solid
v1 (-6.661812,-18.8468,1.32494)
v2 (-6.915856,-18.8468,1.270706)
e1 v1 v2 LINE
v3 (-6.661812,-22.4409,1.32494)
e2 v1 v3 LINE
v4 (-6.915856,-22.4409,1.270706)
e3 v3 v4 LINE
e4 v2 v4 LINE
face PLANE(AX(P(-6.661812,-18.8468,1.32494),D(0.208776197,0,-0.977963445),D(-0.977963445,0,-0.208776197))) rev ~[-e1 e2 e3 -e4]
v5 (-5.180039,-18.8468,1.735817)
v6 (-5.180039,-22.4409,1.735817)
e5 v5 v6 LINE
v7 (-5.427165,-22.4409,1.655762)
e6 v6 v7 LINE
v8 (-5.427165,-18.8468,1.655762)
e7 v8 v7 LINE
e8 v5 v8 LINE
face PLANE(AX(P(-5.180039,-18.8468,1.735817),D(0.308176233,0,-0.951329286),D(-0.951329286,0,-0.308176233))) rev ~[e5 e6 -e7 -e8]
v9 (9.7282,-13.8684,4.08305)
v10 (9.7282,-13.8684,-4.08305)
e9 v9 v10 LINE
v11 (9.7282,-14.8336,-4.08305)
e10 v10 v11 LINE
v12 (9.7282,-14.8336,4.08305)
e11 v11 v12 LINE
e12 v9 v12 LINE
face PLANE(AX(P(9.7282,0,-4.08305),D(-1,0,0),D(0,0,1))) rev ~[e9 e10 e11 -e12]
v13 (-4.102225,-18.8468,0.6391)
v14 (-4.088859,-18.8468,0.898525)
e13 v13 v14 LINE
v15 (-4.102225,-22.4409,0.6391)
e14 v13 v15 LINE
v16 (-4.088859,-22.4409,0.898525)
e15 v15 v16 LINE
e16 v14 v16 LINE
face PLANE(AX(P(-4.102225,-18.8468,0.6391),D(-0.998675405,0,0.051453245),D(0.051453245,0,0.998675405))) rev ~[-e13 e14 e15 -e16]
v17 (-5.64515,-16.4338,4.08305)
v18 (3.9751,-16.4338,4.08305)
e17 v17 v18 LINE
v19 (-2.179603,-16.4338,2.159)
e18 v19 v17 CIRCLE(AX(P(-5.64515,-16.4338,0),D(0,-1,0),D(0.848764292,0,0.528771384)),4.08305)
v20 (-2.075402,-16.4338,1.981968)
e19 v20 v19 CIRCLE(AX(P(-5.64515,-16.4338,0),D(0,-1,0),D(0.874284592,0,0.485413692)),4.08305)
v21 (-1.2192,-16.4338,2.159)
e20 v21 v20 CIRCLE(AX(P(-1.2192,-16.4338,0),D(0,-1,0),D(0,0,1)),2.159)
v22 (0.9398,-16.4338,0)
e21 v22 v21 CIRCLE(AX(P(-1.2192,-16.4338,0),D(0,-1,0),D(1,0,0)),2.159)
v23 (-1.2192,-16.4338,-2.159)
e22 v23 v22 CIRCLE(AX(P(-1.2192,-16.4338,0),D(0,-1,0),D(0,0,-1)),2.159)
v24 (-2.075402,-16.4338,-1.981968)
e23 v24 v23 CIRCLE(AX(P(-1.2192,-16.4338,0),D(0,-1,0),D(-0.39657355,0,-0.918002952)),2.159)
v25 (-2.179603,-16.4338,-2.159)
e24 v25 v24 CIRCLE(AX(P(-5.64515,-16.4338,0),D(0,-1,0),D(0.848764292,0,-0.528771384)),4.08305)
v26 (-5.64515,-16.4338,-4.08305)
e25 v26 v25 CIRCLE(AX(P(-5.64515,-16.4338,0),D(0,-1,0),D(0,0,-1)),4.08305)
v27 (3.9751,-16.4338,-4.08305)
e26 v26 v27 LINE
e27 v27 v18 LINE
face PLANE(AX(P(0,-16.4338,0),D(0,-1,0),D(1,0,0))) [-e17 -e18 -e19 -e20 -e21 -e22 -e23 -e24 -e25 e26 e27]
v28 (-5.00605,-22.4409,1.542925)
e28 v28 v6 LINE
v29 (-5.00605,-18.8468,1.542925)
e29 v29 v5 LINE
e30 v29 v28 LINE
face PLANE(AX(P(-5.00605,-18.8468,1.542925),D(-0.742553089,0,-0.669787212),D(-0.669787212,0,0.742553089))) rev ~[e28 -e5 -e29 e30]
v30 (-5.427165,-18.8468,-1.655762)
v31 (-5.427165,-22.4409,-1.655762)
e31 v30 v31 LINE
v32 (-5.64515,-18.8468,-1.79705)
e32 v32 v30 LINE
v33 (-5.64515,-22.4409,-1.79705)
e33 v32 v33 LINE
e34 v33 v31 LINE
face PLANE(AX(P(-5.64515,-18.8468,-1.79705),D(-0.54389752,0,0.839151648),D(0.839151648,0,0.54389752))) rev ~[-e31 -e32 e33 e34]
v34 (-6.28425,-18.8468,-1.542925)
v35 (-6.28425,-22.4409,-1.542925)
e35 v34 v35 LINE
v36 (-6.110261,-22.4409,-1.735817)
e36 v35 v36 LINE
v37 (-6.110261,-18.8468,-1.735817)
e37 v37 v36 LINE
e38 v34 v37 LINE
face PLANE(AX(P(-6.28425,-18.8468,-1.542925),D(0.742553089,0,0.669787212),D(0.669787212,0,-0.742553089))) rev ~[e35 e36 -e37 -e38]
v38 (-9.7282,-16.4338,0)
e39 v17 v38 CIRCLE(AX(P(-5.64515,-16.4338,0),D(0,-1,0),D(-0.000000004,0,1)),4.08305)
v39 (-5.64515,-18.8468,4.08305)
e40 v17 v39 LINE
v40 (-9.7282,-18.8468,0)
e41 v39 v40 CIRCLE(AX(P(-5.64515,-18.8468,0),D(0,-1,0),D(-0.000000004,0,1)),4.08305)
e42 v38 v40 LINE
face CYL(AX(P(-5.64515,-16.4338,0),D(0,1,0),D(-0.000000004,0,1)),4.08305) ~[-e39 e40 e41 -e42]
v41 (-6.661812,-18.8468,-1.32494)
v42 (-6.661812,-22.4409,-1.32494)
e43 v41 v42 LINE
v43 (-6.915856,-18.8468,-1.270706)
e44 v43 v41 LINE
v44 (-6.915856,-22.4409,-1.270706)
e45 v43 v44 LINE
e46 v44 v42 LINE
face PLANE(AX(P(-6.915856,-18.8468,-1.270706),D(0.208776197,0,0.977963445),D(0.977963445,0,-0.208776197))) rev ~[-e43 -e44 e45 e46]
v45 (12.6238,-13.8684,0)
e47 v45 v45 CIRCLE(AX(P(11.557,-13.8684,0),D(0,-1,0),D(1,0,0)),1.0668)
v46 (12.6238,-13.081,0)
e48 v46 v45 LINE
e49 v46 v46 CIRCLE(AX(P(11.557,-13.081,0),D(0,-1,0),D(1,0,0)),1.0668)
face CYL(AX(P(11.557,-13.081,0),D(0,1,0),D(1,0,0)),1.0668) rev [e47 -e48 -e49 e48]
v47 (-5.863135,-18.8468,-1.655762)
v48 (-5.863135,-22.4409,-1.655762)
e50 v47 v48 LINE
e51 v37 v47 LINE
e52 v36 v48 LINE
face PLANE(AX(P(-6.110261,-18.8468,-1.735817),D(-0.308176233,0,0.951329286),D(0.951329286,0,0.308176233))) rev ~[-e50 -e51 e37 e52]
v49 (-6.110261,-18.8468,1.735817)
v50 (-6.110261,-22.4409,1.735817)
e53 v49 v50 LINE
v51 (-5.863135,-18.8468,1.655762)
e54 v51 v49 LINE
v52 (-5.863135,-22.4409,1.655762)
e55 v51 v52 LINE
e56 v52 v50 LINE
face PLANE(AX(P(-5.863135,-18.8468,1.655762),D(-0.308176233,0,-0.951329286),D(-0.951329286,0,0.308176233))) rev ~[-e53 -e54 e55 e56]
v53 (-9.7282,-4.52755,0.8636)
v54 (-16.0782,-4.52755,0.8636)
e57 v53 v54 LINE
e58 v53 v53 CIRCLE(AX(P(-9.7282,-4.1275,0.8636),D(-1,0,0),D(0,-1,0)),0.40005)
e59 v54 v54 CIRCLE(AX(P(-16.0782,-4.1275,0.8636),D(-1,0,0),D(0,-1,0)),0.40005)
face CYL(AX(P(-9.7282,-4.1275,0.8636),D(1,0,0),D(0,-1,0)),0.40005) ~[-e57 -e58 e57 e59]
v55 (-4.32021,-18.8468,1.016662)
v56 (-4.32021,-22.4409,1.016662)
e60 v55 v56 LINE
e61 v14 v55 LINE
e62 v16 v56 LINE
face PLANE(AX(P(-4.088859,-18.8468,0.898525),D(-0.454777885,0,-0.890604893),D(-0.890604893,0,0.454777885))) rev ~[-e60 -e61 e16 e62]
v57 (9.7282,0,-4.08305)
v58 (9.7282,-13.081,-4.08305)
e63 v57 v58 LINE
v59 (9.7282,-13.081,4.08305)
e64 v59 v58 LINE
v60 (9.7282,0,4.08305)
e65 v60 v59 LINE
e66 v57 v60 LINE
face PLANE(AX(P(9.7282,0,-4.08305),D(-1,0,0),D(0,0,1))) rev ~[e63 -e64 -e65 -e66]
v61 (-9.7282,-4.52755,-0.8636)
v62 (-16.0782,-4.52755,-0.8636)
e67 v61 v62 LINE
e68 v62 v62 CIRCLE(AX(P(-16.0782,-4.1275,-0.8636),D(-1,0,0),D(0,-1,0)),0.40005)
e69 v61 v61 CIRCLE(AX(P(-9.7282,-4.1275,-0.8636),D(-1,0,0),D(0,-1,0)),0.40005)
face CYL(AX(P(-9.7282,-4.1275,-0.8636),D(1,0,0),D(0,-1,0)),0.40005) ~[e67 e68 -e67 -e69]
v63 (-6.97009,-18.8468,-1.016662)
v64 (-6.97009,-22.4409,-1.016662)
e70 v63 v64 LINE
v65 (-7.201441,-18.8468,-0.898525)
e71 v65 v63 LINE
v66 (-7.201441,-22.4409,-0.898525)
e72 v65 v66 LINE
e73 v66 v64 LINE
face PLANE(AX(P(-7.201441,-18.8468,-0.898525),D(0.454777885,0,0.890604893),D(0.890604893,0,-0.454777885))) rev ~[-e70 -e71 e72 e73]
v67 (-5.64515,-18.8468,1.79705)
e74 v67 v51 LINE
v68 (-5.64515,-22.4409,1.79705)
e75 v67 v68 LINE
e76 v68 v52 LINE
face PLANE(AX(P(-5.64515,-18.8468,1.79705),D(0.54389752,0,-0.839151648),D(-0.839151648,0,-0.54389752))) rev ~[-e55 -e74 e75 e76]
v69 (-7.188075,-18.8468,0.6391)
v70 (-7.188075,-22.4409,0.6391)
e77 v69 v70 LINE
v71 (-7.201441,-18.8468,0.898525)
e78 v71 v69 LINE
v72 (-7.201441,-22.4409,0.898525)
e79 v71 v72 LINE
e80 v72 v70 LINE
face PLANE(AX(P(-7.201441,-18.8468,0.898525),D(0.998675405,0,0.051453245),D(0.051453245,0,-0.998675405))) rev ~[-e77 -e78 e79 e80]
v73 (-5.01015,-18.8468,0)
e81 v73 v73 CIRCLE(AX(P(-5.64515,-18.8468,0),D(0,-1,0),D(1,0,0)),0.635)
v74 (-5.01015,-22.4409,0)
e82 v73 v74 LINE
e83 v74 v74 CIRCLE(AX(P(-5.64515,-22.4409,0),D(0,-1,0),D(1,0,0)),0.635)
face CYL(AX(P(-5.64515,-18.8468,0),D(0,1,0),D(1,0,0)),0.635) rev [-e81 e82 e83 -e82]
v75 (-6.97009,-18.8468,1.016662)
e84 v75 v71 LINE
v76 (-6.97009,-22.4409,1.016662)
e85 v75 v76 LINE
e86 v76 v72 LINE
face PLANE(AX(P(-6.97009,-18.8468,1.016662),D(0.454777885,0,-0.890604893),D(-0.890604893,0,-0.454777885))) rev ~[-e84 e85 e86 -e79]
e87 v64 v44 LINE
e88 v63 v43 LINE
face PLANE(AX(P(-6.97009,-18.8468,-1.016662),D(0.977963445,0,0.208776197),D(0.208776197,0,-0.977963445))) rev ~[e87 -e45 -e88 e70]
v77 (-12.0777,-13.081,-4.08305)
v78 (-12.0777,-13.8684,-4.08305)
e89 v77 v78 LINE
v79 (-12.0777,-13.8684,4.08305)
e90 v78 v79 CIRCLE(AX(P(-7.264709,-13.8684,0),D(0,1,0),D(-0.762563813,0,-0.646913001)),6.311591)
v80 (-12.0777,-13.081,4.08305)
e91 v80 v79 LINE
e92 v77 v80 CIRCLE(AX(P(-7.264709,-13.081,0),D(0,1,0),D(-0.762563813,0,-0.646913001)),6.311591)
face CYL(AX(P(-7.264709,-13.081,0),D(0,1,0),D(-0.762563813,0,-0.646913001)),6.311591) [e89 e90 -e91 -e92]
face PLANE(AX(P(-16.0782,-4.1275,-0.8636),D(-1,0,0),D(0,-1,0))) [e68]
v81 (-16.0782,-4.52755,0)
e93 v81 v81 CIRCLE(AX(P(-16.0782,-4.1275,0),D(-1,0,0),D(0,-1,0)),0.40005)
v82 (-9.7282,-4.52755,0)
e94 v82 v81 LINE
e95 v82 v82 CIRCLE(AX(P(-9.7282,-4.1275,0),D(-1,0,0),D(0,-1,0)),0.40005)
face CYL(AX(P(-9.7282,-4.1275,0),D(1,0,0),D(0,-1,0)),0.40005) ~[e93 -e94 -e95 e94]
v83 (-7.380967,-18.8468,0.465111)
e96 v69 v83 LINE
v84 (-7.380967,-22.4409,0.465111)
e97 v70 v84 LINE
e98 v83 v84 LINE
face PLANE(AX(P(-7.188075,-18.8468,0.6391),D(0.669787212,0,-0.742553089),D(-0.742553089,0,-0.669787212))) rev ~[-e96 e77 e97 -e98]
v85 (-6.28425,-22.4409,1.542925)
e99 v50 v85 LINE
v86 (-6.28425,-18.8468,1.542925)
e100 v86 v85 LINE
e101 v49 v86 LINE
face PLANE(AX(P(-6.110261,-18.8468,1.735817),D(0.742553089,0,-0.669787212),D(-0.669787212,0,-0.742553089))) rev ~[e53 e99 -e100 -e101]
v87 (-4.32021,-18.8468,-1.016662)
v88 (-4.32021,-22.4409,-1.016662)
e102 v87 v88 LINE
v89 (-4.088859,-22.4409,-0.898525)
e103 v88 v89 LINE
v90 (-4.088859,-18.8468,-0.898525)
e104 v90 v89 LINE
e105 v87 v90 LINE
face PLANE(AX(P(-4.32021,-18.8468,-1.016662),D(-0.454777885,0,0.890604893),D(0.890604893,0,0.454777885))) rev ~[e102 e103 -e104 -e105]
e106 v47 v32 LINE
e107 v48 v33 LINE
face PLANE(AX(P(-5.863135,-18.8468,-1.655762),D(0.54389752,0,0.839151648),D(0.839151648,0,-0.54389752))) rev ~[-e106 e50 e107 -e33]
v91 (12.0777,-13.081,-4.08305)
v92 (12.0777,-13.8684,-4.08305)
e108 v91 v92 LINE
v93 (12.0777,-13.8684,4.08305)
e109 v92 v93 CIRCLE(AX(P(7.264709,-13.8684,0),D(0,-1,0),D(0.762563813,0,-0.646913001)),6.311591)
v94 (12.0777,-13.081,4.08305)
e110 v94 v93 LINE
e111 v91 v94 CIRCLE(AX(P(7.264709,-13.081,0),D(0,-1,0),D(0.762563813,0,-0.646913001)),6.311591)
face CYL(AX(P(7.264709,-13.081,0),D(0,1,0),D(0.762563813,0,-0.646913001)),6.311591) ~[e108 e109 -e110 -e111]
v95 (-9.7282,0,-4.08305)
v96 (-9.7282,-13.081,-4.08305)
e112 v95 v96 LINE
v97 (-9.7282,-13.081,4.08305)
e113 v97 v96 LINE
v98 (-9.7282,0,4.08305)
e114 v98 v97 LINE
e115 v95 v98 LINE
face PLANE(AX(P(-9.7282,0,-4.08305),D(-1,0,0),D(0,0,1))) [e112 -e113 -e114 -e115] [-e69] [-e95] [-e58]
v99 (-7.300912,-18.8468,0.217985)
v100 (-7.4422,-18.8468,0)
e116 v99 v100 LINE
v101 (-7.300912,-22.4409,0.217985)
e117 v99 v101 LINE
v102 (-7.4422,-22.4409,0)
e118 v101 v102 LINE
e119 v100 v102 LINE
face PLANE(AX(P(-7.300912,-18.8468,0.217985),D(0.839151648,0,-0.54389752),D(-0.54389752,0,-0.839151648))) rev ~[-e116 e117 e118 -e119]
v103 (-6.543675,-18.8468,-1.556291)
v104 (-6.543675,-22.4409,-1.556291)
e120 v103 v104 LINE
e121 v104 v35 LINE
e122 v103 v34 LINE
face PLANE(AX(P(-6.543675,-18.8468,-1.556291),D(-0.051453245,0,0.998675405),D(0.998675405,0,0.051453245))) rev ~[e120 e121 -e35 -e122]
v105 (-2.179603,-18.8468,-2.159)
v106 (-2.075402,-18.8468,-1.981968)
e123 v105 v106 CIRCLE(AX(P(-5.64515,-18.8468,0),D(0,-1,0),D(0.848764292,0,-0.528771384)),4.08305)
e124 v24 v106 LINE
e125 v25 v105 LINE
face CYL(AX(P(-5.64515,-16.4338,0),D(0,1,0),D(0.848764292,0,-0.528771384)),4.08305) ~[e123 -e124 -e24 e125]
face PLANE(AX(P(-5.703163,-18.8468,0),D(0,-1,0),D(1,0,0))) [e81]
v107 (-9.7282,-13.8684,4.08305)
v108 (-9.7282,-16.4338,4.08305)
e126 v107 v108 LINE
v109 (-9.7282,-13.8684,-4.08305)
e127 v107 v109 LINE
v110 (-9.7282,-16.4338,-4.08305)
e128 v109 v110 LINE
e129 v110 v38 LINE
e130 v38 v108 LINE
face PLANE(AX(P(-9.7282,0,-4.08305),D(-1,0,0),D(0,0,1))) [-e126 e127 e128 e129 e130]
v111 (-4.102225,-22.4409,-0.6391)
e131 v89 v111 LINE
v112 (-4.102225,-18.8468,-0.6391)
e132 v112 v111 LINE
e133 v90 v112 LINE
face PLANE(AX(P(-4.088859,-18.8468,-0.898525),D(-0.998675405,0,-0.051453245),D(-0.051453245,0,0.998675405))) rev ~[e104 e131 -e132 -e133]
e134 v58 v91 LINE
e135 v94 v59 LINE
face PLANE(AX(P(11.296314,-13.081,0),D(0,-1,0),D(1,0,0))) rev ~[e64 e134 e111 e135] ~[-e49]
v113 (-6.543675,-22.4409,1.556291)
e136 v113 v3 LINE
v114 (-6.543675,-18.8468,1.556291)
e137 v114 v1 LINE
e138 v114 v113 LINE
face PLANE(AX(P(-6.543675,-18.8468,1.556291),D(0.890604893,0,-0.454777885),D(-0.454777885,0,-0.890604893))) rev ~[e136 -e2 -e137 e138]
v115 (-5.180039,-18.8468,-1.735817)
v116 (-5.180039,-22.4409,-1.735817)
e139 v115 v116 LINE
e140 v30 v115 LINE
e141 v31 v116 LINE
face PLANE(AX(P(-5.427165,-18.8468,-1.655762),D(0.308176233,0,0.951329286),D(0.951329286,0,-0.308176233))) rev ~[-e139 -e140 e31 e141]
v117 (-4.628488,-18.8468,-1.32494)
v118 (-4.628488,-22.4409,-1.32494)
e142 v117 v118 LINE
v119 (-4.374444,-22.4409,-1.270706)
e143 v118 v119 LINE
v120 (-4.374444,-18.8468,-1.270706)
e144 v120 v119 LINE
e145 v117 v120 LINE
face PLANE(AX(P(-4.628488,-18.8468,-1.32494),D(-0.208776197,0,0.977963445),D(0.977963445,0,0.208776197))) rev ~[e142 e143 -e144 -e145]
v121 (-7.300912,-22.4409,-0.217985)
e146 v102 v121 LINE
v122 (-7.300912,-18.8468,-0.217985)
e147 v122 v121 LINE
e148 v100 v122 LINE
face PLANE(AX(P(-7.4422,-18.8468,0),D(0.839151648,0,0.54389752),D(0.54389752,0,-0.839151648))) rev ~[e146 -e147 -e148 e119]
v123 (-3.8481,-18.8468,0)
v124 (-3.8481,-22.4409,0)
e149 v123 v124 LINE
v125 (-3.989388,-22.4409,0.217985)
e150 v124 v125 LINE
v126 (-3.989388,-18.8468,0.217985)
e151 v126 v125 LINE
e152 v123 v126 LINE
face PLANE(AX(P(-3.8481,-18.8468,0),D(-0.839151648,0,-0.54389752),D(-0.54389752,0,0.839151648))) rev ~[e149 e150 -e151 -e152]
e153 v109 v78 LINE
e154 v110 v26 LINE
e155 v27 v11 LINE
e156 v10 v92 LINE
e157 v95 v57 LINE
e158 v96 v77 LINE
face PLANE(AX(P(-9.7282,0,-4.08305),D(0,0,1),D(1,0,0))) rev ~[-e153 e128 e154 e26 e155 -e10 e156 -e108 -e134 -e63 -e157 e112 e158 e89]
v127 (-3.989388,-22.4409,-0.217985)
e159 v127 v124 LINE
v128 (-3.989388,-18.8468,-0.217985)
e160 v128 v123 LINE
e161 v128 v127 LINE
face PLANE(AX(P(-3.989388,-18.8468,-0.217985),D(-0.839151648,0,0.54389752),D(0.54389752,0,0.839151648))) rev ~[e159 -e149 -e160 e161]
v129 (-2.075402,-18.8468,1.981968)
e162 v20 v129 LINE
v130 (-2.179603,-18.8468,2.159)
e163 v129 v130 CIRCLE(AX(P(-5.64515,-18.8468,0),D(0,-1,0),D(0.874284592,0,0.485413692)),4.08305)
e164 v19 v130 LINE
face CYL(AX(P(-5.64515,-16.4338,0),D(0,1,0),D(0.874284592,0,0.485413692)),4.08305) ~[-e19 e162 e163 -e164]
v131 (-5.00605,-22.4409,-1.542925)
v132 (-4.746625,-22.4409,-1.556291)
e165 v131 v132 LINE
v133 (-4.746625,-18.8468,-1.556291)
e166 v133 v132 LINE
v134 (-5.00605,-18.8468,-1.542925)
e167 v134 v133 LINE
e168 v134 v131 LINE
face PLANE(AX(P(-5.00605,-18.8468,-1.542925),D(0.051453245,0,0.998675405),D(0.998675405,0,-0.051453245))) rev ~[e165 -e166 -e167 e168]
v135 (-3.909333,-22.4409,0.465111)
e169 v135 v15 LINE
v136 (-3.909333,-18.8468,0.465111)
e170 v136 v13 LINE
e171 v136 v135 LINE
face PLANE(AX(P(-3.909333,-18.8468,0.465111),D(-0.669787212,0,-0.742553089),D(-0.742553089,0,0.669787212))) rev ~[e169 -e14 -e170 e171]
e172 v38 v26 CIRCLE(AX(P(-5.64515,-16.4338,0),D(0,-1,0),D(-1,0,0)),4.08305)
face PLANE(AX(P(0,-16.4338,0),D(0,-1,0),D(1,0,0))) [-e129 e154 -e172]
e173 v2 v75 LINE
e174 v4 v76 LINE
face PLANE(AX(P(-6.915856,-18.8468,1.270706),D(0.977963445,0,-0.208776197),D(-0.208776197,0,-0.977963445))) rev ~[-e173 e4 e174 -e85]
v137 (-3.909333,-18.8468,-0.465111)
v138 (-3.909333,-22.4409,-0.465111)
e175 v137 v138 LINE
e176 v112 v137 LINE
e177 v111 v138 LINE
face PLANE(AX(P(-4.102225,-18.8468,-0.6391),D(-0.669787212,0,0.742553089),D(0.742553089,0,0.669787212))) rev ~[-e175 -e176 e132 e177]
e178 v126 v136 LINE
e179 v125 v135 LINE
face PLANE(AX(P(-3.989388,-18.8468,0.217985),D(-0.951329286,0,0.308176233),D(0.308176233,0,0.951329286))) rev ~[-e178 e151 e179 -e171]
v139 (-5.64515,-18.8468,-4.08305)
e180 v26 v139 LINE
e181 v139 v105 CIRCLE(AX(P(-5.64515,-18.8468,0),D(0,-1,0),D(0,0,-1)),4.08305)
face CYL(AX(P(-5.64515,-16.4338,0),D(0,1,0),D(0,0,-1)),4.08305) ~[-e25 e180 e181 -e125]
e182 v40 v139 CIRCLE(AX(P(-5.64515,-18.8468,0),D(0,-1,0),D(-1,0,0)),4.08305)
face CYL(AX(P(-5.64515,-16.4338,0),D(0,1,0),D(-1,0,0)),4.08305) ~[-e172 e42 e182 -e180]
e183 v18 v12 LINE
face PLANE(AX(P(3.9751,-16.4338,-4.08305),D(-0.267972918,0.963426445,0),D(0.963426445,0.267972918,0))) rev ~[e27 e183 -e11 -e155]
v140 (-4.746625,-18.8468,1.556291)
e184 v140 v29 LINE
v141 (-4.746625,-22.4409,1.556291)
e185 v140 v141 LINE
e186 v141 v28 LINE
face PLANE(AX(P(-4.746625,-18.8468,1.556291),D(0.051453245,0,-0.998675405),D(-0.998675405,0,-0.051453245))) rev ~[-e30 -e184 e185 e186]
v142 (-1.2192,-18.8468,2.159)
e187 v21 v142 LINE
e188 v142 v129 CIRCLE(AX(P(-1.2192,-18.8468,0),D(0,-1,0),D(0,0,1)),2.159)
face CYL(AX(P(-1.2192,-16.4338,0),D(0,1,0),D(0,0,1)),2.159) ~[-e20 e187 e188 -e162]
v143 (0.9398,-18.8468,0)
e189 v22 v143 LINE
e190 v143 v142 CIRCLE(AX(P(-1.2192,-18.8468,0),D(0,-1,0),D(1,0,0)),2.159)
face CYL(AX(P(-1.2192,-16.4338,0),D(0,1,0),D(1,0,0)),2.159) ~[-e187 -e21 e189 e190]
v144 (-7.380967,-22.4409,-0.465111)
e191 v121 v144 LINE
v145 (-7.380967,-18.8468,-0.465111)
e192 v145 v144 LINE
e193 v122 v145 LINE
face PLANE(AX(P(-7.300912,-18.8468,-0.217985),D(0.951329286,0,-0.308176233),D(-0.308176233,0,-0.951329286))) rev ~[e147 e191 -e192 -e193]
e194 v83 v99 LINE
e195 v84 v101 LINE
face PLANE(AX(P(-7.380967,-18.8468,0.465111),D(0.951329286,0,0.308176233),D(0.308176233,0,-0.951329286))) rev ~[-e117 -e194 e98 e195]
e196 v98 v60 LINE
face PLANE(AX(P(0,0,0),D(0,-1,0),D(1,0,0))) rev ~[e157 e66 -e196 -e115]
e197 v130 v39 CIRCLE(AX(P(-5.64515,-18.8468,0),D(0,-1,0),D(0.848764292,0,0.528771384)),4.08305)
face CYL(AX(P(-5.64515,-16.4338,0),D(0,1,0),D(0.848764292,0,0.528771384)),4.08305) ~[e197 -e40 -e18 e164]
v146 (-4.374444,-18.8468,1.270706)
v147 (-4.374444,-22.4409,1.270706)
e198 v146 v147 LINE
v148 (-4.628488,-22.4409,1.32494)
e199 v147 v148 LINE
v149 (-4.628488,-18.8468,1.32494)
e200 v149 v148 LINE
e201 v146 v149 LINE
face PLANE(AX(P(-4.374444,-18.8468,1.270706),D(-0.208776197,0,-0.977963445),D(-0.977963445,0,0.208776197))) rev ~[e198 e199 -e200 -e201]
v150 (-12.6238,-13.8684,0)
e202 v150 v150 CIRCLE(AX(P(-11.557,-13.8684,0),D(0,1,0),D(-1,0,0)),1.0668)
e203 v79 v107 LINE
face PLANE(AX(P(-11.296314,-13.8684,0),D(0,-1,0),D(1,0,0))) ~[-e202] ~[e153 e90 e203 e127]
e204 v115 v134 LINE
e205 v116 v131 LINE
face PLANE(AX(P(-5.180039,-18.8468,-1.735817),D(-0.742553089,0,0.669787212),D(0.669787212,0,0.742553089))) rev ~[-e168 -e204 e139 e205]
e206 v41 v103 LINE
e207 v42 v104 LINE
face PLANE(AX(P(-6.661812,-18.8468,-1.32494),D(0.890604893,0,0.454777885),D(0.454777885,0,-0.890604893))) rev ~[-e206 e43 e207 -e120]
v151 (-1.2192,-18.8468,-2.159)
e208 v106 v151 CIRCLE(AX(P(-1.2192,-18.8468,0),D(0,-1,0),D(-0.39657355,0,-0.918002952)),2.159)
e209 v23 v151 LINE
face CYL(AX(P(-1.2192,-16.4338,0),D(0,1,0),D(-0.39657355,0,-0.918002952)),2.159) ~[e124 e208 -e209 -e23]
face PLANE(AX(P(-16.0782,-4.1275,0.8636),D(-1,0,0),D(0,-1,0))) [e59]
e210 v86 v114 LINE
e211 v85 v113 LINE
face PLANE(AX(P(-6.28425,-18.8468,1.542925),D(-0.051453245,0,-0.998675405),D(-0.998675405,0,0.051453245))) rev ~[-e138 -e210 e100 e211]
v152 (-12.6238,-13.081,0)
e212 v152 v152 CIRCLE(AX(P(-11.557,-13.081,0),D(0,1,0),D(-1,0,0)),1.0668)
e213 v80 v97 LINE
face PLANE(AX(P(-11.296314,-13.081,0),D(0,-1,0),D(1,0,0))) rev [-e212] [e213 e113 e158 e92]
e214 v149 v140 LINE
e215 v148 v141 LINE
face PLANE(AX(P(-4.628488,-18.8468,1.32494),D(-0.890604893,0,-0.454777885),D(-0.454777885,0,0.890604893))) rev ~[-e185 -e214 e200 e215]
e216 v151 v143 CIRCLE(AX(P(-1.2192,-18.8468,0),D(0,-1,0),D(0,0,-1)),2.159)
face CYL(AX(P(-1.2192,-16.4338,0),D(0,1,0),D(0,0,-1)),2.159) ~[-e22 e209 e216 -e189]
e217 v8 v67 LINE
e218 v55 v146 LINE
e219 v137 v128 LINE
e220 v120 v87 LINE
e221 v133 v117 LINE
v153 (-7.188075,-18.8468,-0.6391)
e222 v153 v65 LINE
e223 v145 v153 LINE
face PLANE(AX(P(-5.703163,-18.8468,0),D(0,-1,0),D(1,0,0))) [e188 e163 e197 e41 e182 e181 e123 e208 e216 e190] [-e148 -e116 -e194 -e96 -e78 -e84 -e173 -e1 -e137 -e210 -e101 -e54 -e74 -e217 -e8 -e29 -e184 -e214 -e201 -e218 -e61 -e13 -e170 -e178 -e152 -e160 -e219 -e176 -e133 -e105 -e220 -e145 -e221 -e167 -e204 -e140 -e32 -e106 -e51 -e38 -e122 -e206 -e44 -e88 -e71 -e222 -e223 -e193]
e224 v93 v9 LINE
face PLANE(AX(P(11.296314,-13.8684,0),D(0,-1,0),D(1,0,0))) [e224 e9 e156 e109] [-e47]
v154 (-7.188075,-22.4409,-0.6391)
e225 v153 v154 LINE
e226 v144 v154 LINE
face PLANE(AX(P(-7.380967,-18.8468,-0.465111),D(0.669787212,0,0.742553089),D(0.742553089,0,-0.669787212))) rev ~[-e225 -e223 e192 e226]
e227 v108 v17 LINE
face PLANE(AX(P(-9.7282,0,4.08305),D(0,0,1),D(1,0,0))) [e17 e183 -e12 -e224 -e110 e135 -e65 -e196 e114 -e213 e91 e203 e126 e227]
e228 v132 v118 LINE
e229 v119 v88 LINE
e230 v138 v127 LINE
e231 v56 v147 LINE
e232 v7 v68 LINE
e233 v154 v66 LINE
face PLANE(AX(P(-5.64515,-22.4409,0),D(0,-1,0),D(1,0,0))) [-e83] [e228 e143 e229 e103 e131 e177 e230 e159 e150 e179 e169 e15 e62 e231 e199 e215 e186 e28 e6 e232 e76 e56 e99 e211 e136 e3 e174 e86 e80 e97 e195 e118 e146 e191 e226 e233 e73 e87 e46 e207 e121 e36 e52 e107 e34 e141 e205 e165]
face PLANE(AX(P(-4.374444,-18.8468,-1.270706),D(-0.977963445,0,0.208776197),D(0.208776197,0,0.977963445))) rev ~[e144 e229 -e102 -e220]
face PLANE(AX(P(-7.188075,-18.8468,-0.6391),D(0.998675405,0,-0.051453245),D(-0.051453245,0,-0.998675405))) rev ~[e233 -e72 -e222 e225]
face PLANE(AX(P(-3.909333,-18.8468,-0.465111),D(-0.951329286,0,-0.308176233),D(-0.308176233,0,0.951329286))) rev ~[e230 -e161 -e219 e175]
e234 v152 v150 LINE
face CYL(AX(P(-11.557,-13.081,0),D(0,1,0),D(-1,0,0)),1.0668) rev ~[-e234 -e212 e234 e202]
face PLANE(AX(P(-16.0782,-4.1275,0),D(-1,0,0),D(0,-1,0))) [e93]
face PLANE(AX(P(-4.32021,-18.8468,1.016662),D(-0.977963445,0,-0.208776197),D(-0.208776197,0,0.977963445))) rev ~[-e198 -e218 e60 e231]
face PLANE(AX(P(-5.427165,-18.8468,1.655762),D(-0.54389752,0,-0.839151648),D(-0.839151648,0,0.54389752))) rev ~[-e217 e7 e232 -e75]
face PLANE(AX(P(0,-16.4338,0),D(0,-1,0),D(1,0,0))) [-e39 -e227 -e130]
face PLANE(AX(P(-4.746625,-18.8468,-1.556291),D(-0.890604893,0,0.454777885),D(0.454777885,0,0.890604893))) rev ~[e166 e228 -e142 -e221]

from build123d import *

# Parameters (mm, degrees)
F0_W      = 19.4564
F0_H      = 8.1661
F1_DEPTH  = 16.4338
F3_DEPTH  = 8.1661
F5_DEPTH  = 2.413
F6_R      = 0.635
F7_DEPTH  = 3.5941
F9_R      = 1.0668
F10_DEPTH = 0.7874
F11_R     = 0.40005
F12_DEPTH = 6.35


# Not quite as in the source:
# - a pattern or mirror of a feature is missing from the dataset's text; its kind, count and spacing are read off the source's solid


with BuildPart() as f1:
    # F0 (on Front) → F1 (new body)
    with BuildSketch(Plane.XZ):
        Rectangle(F0_W, F0_H)
    extrude(amount=F1_DEPTH)

    # F2 (on face) → F3 (cut, through all)
    with BuildSketch(Plane(origin=(0, 0, -4.08305), x_dir=(1, 0, 0), z_dir=(0, 0, -1))):
        Polygon((3.9751, 16.4338), (9.7282, 14.8336), (9.7282, 16.4338), align=None)
    extrude(amount=-F3_DEPTH, mode=Mode.SUBTRACT)

    # F4 (on face) → F5 (join)
    with BuildSketch(Plane.XZ.offset(16.4338)):
        with BuildLine():
            ThreePointArc((-2.0754022956, -1.9819683724), (-3.3782, 0), (-2.0754022956, 1.9819683724))
            ThreePointArc((-2.0754022956, 1.9819683724), (-2.1263891254, 2.071139592), (-2.1796029577, 2.159))
            ThreePointArc((-2.1796029577, 2.159), (-3.6632327094, 3.5697760652), (-5.6451500171, 4.08305))
            ThreePointArc((-5.6451500171, 4.08305), (-8.532302349, 2.8871523369), (-9.7282, 0))
            ThreePointArc((-9.7282, 0), (-8.5323023429, -2.8871523429), (-5.64515, -4.08305))
            ThreePointArc((-5.64515, -4.08305), (-3.663232702, -3.5697760611), (-2.1796029577, -2.159))
            ThreePointArc((-2.1796029577, -2.159), (-2.1263891254, -2.071139592), (-2.0754022956, -1.9819683724))
        make_face()
        with BuildLine():
            ThreePointArc((-2.0754022956, -1.9819683724), (-1.6925081197, -1.023679378), (-1.5621, 0))
            ThreePointArc((-1.5621, 0), (-1.6925081197, 1.023679378), (-2.0754022956, 1.9819683724))
            ThreePointArc((-2.0754022956, 1.9819683724), (-3.3782, 0), (-2.0754022956, -1.9819683724))
        make_face()
        with BuildLine():
            ThreePointArc((-2.0754022956, 1.9819683724), (-1.6925081197, 1.023679378), (-1.5621, 0))
            ThreePointArc((-1.5621, 0), (-1.6925081197, -1.023679378), (-2.0754022956, -1.9819683724))
            ThreePointArc((-2.0754022956, -1.9819683724), (-1.656356313, -2.1142789215), (-1.2192, -2.159))
            ThreePointArc((-1.2192, -2.159), (0.3074435406, -1.5266435406), (0.9398, 0))
            ThreePointArc((0.9398, 0), (0.3074435406, 1.5266435406), (-1.2192, 2.159))
            ThreePointArc((-1.2192, 2.159), (-1.656356313, 2.1142789215), (-2.0754022956, 1.9819683724))
        make_face()
    extrude(amount=F5_DEPTH)

    # F6 (on face) → F7 (join)
    with BuildSketch(Plane.XZ.offset(18.8468)):
        Polygon((-5.4271647327, 1.6557624907), (-5.64515, 1.79705), (-5.8631352673, 1.6557624907), (-6.110260765, 1.7358170061), (-6.2842504662, 1.5429250133), (-6.543675, 1.5562909519), (-6.6618120245, 1.324939746), (-6.9158562411, 1.2707062411), (-6.970089746, 1.0166620245), (-7.2014409519, 0.898525), (-7.1880750133, 0.6391004662), (-7.3809670061, 0.465110765), (-7.3009124907, 0.2179852673), (-7.4422, 0), (-7.3009124907, -0.2179852673), (-7.3809670061, -0.465110765), (-7.1880750133, -0.6391004662), (-7.2014409519, -0.898525), (-6.970089746, -1.0166620245), (-6.9158562411, -1.2707062411), (-6.6618120245, -1.324939746), (-6.543675, -1.5562909519), (-6.2842504662, -1.5429250133), (-6.110260765, -1.7358170061), (-5.8631352673, -1.6557624907), (-5.64515, -1.79705), (-5.4271647327, -1.6557624907), (-5.180039235, -1.7358170061), (-5.0060495338, -1.5429250133), (-4.746625, -1.5562909519), (-4.6284879755, -1.324939746), (-4.3744437589, -1.2707062411), (-4.320210254, -1.0166620245), (-4.0888590481, -0.898525), (-4.1022249867, -0.6391004662), (-3.9093329939, -0.465110765), (-3.9893875093, -0.2179852673), (-3.8481, 0), (-3.9893875093, 0.2179852673), (-3.9093329939, 0.465110765), (-4.1022249867, 0.6391004662), (-4.0888590481, 0.898525), (-4.320210254, 1.0166620245), (-4.3744437589, 1.2707062411), (-4.6284879755, 1.324939746), (-4.746625, 1.5562909519), (-5.0060495338, 1.5429250133), (-5.180039235, 1.7358170061), align=None)
        with Locations((-5.64515, 0)):
            Circle(F6_R, mode=Mode.SUBTRACT)
    extrude(amount=F7_DEPTH)

    # F9 (on offset) → F10 (join)
    with BuildSketch(Plane.XZ.offset(13.081)):
        with BuildLine():
            Line((12.0777, 4.08305), (9.7282, 4.08305))
            Line((9.7282, 4.08305), (9.7282, -4.08305))
            Line((9.7282, -4.08305), (12.0777, -4.08305))
            ThreePointArc((12.0777, -4.08305), (13.5763, 0), (12.0777, 4.08305))
        make_face()
        with Locations((11.557, 0)):
            Circle(F9_R, mode=Mode.SUBTRACT)
    f10 = extrude(amount=F10_DEPTH)

    # F10_copies: F10 across plane
    add(f10.mirror(Plane(origin=(0, 0, 0), x_dir=(0, 0, -1), z_dir=(-1, 0, 0))))

    # F11 (on face) → F12 (join)
    with BuildSketch(Plane(origin=(-9.7282, 0, 0), x_dir=(0, -1, 0), z_dir=(-1, 0, 0))):
        with Locations((4.1275, 0.8636)):
            Circle(F11_R)
        with Locations((4.1275, 0)):
            Circle(F11_R)
        with Locations((4.1275, -0.8636)):
            Circle(F11_R)
    extrude(amount=F12_DEPTH)


solid = f1.part
